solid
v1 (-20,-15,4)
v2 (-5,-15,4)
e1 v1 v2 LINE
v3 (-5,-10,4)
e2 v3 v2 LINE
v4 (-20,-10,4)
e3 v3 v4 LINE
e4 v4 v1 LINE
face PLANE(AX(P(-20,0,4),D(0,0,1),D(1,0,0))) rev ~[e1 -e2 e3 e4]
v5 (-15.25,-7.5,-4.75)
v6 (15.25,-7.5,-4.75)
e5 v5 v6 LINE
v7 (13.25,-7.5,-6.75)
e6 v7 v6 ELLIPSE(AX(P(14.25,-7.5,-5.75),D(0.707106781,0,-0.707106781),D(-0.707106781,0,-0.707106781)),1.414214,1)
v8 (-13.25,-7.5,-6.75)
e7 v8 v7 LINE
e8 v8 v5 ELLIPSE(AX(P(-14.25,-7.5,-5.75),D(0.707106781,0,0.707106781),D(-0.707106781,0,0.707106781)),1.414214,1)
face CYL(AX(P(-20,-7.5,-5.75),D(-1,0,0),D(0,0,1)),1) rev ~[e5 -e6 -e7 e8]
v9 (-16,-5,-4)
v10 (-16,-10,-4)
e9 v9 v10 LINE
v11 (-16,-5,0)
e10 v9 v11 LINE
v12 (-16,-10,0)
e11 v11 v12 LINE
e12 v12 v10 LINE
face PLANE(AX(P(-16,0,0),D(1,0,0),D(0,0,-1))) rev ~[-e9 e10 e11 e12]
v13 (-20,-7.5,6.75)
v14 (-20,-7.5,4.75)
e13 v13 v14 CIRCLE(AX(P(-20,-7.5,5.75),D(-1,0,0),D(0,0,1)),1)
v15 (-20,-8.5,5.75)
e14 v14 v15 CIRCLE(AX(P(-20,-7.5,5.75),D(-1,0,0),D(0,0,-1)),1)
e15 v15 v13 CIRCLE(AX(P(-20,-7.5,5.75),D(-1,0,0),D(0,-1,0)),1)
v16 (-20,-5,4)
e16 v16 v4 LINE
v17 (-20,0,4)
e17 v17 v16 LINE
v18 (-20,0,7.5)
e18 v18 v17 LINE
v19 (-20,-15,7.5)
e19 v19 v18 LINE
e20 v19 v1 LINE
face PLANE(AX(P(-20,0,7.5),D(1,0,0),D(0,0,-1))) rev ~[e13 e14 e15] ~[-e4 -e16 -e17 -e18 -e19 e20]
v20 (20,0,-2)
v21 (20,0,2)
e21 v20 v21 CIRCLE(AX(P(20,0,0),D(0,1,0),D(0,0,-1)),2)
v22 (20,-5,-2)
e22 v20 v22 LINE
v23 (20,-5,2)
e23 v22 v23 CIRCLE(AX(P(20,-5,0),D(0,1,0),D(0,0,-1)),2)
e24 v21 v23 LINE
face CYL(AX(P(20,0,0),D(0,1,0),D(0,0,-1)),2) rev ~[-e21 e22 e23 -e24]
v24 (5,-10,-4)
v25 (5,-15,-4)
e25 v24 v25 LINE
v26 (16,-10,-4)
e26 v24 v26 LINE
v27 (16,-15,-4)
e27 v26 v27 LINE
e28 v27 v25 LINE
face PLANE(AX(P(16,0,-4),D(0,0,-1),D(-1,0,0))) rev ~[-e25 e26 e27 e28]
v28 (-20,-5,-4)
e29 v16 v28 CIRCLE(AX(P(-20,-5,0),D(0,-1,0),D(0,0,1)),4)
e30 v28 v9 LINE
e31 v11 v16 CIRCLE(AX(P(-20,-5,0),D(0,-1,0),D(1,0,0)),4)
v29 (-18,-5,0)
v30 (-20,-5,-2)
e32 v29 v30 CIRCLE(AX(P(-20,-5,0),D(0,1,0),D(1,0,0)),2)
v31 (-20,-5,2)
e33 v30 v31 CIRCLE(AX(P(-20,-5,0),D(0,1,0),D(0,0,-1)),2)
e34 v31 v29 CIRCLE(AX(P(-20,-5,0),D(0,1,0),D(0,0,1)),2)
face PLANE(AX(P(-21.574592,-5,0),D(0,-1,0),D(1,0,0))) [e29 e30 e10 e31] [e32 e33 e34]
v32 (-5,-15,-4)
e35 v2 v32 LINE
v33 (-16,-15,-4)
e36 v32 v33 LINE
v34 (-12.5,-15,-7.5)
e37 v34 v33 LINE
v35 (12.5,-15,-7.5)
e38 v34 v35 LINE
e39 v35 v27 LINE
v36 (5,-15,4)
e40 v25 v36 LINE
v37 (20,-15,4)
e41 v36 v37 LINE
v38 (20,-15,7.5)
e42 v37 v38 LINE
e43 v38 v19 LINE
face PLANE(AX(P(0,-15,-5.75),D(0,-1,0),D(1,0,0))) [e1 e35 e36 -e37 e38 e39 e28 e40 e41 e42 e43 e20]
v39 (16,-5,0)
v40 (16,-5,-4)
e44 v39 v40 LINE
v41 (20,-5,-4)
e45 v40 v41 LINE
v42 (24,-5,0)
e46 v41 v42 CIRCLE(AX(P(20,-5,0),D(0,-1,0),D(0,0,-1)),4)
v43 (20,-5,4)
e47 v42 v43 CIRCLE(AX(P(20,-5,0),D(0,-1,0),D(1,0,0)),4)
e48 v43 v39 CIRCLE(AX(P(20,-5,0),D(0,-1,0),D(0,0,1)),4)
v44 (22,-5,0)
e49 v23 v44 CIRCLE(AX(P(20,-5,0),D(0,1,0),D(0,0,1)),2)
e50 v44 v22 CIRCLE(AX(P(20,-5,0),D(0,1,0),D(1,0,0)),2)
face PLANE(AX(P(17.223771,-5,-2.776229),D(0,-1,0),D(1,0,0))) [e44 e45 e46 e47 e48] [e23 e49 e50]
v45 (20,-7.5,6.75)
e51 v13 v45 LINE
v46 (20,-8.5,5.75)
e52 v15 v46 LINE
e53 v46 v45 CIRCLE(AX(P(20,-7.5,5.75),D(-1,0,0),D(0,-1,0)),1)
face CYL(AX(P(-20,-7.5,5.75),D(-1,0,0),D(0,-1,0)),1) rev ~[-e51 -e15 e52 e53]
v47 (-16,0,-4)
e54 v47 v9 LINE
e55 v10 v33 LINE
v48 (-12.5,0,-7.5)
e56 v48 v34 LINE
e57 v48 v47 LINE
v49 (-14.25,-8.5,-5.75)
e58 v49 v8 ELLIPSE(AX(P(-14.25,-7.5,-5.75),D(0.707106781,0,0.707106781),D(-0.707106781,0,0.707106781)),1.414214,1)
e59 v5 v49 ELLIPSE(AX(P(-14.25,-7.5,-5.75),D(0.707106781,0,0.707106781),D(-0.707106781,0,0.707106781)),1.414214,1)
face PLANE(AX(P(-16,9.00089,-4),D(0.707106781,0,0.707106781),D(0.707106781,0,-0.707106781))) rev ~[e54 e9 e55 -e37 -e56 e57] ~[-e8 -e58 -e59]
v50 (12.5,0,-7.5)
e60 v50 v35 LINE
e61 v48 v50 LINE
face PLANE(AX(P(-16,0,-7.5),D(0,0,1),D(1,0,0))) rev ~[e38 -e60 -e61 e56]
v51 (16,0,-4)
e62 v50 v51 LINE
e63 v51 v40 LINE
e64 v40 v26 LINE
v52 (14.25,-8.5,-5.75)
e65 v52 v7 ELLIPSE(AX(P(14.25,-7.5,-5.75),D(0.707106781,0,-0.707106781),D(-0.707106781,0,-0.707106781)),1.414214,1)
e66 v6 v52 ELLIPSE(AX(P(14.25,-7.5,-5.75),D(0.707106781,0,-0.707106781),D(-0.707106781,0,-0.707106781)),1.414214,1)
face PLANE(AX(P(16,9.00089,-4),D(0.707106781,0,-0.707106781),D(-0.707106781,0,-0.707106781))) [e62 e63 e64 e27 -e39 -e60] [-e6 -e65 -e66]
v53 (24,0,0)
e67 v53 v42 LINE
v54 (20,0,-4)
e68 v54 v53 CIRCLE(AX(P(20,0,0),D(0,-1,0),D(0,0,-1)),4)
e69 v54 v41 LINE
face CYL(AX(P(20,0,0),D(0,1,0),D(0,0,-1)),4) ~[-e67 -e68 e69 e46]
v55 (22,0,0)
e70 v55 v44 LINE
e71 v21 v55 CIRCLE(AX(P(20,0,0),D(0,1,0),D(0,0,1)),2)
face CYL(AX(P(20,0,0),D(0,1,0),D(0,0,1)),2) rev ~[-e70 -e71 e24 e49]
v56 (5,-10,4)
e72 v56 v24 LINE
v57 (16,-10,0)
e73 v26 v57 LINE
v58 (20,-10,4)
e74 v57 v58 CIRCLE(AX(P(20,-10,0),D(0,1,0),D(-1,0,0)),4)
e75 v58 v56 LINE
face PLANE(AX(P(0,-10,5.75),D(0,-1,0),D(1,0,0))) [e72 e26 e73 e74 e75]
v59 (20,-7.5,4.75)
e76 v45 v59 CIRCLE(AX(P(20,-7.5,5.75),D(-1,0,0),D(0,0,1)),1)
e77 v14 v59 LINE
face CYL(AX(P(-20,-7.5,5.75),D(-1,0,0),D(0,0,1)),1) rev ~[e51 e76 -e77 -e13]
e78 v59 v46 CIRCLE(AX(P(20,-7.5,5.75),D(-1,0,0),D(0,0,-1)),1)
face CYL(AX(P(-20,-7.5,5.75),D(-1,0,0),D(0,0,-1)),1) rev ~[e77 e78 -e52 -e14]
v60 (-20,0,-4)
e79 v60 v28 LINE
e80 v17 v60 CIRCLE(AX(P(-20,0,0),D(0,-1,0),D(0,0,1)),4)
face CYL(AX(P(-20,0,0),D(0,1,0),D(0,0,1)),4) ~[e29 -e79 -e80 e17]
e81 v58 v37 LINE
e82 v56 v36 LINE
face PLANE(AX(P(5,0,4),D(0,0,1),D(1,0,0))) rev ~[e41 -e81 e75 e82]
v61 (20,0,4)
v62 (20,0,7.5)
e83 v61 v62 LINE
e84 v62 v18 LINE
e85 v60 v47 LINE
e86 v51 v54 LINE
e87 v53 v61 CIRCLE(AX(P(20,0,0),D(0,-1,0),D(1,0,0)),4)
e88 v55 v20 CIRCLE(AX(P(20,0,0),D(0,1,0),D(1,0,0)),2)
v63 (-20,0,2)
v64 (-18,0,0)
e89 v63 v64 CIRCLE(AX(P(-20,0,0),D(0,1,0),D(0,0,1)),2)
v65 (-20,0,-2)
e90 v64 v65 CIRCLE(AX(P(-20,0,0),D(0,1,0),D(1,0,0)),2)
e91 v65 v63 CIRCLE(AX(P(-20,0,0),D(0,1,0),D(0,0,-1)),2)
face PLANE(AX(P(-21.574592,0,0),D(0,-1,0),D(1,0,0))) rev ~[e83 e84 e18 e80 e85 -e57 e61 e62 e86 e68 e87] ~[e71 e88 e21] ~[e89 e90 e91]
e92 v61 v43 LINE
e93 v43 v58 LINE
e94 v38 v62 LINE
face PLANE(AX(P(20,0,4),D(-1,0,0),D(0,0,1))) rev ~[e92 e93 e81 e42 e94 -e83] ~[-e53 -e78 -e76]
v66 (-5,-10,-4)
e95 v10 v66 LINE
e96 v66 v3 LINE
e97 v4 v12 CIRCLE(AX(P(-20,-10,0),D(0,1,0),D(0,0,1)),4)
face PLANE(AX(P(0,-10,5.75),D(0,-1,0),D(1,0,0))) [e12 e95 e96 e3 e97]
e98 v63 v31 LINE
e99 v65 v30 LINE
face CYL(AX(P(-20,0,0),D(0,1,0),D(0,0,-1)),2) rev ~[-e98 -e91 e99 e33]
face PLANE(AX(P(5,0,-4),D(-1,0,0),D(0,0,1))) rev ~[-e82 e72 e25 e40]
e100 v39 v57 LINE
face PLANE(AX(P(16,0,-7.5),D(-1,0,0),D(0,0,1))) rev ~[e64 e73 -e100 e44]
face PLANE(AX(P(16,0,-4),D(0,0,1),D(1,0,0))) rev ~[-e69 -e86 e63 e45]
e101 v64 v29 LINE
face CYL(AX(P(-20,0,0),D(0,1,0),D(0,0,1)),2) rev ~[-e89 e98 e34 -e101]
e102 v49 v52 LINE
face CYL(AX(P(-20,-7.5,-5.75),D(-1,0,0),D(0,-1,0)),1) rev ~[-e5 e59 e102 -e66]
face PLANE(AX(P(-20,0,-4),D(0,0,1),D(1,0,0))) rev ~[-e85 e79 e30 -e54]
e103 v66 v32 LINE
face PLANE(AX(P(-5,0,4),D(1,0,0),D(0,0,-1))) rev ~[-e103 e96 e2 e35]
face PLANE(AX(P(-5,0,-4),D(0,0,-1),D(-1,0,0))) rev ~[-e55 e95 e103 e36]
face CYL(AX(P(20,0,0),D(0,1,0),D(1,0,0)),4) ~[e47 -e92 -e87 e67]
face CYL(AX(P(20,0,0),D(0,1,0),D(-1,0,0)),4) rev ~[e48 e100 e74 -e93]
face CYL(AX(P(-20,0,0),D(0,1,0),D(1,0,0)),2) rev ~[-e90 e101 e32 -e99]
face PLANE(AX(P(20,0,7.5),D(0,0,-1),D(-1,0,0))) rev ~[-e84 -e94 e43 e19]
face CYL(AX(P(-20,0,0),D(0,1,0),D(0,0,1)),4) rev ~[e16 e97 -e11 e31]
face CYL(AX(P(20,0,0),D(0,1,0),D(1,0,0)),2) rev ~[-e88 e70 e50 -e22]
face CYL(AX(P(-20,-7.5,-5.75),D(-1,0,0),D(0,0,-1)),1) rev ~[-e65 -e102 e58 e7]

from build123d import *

# Parameters (mm, degrees)
F0_W        = 11
F0_H        = 4
F0_W_2      = 10
F1_DEPTH    = 10
F2_DEPTH    = 5
F3_DEPTH    = 15
F5_DEPTH    = 40
F6_T1_DEPTH = 33.0017809158


# Not quite as in the source:
# - a fillet or chamfer that OpenCascade refuses, or shapes differently, is made with other operations: its cross-section is extruded or revolved along the edge and cut away or added


with BuildPart() as f1:
    # F0 (on Front) → F1 (new body)
    with BuildSketch(Plane.XZ):
        Polygon((-5, 4), (5, 4), (20, 4), (20, 7.5), (-20, 7.5), (-20, 4), align=None)
        with BuildLine():
            Line((-5, 0), (-5, 4))
            Line((-5, 4), (-20, 4))
            ThreePointArc((-20, 4), (-17.1715728753, 2.8284271247), (-16, 0))
            Line((-16, 0), (-5, 0))
        make_face()
        with Locations((-10.5, -2)):
            Rectangle(F0_W, F0_H)
        Polygon((16, -4), (5, -4), (-5, -4), (-16, -4), (-16, -7.5), (16, -7.5), align=None)
        with Locations((0, -2)):
            Rectangle(F0_W_2, F0_H)
        with Locations((0, 2)):
            Rectangle(F0_W_2, F0_H)
        with BuildLine():
            Line((20, 4), (5, 4))
            Line((5, 4), (5, 0))
            Line((5, 0), (16, 0))
            ThreePointArc((16, 0), (17.1715728753, 2.8284271247), (20, 4))
        make_face()
        with Locations((10.5, -2)):
            Rectangle(F0_W, F0_H)
    extrude(amount=F1_DEPTH)

    # F0 (on Front) → F2 (join)
    with BuildSketch(Plane.XZ):
        with BuildLine():
            Line((-20, 2), (-20, 4))
            ThreePointArc((-20, 4), (-24, 0), (-20, -4))
            Line((-20, -4), (-20, -2))
            ThreePointArc((-20, -2), (-22, 0), (-20, 2))
        make_face()
        with BuildLine():
            ThreePointArc((-16, 0), (-17.1715728753, 2.8284271247), (-20, 4))
            Line((-20, 4), (-20, 2))
            ThreePointArc((-20, 2), (-18.5857864376, 1.4142135624), (-18, 0))
            ThreePointArc((-18, 0), (-18.5857864376, -1.4142135624), (-20, -2))
            Line((-20, -2), (-20, -4))
            ThreePointArc((-20, -4), (-17.1715728753, -2.8284271247), (-16, 0))
        make_face()
        with BuildLine():
            Line((-16, -4), (-16, 0))
            ThreePointArc((-16, 0), (-17.1715728753, -2.8284271247), (-20, -4))
            Line((-20, -4), (-16, -4))
        make_face()
        with BuildLine():
            ThreePointArc((20, -4), (17.1715728753, -2.8284271247), (16, 0))
            Line((16, 0), (16, -4))
            Line((16, -4), (20, -4))
        make_face()
        with BuildLine():
            Line((20, 2), (20, 4))
            ThreePointArc((20, 4), (17.1715728753, 2.8284271247), (16, 0))
            ThreePointArc((16, 0), (17.1715728753, -2.8284271247), (20, -4))
            Line((20, -4), (20, -2))
            ThreePointArc((20, -2), (18, 0), (20, 2))
        make_face()
        with BuildLine():
            ThreePointArc((24, 0), (22.8284271247, 2.8284271247), (20, 4))
            Line((20, 4), (20, 2))
            ThreePointArc((20, 2), (21.4142135624, 1.4142135624), (22, 0))
            ThreePointArc((22, 0), (21.4142135624, -1.4142135624), (20, -2))
            Line((20, -2), (20, -4))
            ThreePointArc((20, -4), (22.8284271247, -2.8284271247), (24, 0))
        make_face()
    extrude(amount=F2_DEPTH)

    # F0 (on Front) → F3 (join)
    with BuildSketch(Plane.XZ):
        Polygon((16, -4), (5, -4), (-5, -4), (-16, -4), (-16, -7.5), (16, -7.5), align=None)
        with Locations((0, -2)):
            Rectangle(F0_W_2, F0_H)
        with Locations((0, 2)):
            Rectangle(F0_W_2, F0_H)
        Polygon((-5, 4), (5, 4), (20, 4), (20, 7.5), (-20, 7.5), (-20, 4), align=None)
    extrude(amount=F3_DEPTH)

    # F4 (on face) → F5 (cut)
    with BuildSketch(Plane(origin=(-20, 0, 0), x_dir=(0, -1, 0), z_dir=(-1, 0, 0))):
        with BuildLine():
            ThreePointArc((8.5, -5.75), (8.2071067812, -5.0428932188), (7.5, -4.75))
            Line((7.5, -4.75), (7.5, -6.75))
            ThreePointArc((7.5, -6.75), (8.2071067812, -6.4571067812), (8.5, -5.75))
        make_face()
        with BuildLine():
            Line((7.5, -6.75), (7.5, -4.75))
            ThreePointArc((7.5, -4.75), (6.5, -5.75), (7.5, -6.75))
        make_face()
        with BuildLine():
            ThreePointArc((7.5, 6.75), (6.5, 5.75), (7.5, 4.75))
            Line((7.5, 4.75), (7.5, 6.75))
        make_face()
        with BuildLine():
            Line((7.5, 6.75), (7.5, 4.75))
            ThreePointArc((7.5, 4.75), (8.2071067812, 5.0428932188), (8.5, 5.75))
            ThreePointArc((8.5, 5.75), (8.2071067812, 6.4571067812), (7.5, 6.75))
        make_face()
    extrude(amount=-F5_DEPTH, mode=Mode.SUBTRACT)

    # F6: chamfer of 3.5 on 2 edges, made by hand

    # F6_s2 → F6_t1 (cut)
    with BuildSketch(Plane.XZ.offset(-9.0008904579)):
        Polygon((-16, -4), (-12.5, -7.5), (-16, -7.5), align=None)
        Polygon((16, -4), (12.5, -7.5), (16, -7.5), align=None)
    extrude(amount=F6_T1_DEPTH, mode=Mode.SUBTRACT)


solid = f1.part
